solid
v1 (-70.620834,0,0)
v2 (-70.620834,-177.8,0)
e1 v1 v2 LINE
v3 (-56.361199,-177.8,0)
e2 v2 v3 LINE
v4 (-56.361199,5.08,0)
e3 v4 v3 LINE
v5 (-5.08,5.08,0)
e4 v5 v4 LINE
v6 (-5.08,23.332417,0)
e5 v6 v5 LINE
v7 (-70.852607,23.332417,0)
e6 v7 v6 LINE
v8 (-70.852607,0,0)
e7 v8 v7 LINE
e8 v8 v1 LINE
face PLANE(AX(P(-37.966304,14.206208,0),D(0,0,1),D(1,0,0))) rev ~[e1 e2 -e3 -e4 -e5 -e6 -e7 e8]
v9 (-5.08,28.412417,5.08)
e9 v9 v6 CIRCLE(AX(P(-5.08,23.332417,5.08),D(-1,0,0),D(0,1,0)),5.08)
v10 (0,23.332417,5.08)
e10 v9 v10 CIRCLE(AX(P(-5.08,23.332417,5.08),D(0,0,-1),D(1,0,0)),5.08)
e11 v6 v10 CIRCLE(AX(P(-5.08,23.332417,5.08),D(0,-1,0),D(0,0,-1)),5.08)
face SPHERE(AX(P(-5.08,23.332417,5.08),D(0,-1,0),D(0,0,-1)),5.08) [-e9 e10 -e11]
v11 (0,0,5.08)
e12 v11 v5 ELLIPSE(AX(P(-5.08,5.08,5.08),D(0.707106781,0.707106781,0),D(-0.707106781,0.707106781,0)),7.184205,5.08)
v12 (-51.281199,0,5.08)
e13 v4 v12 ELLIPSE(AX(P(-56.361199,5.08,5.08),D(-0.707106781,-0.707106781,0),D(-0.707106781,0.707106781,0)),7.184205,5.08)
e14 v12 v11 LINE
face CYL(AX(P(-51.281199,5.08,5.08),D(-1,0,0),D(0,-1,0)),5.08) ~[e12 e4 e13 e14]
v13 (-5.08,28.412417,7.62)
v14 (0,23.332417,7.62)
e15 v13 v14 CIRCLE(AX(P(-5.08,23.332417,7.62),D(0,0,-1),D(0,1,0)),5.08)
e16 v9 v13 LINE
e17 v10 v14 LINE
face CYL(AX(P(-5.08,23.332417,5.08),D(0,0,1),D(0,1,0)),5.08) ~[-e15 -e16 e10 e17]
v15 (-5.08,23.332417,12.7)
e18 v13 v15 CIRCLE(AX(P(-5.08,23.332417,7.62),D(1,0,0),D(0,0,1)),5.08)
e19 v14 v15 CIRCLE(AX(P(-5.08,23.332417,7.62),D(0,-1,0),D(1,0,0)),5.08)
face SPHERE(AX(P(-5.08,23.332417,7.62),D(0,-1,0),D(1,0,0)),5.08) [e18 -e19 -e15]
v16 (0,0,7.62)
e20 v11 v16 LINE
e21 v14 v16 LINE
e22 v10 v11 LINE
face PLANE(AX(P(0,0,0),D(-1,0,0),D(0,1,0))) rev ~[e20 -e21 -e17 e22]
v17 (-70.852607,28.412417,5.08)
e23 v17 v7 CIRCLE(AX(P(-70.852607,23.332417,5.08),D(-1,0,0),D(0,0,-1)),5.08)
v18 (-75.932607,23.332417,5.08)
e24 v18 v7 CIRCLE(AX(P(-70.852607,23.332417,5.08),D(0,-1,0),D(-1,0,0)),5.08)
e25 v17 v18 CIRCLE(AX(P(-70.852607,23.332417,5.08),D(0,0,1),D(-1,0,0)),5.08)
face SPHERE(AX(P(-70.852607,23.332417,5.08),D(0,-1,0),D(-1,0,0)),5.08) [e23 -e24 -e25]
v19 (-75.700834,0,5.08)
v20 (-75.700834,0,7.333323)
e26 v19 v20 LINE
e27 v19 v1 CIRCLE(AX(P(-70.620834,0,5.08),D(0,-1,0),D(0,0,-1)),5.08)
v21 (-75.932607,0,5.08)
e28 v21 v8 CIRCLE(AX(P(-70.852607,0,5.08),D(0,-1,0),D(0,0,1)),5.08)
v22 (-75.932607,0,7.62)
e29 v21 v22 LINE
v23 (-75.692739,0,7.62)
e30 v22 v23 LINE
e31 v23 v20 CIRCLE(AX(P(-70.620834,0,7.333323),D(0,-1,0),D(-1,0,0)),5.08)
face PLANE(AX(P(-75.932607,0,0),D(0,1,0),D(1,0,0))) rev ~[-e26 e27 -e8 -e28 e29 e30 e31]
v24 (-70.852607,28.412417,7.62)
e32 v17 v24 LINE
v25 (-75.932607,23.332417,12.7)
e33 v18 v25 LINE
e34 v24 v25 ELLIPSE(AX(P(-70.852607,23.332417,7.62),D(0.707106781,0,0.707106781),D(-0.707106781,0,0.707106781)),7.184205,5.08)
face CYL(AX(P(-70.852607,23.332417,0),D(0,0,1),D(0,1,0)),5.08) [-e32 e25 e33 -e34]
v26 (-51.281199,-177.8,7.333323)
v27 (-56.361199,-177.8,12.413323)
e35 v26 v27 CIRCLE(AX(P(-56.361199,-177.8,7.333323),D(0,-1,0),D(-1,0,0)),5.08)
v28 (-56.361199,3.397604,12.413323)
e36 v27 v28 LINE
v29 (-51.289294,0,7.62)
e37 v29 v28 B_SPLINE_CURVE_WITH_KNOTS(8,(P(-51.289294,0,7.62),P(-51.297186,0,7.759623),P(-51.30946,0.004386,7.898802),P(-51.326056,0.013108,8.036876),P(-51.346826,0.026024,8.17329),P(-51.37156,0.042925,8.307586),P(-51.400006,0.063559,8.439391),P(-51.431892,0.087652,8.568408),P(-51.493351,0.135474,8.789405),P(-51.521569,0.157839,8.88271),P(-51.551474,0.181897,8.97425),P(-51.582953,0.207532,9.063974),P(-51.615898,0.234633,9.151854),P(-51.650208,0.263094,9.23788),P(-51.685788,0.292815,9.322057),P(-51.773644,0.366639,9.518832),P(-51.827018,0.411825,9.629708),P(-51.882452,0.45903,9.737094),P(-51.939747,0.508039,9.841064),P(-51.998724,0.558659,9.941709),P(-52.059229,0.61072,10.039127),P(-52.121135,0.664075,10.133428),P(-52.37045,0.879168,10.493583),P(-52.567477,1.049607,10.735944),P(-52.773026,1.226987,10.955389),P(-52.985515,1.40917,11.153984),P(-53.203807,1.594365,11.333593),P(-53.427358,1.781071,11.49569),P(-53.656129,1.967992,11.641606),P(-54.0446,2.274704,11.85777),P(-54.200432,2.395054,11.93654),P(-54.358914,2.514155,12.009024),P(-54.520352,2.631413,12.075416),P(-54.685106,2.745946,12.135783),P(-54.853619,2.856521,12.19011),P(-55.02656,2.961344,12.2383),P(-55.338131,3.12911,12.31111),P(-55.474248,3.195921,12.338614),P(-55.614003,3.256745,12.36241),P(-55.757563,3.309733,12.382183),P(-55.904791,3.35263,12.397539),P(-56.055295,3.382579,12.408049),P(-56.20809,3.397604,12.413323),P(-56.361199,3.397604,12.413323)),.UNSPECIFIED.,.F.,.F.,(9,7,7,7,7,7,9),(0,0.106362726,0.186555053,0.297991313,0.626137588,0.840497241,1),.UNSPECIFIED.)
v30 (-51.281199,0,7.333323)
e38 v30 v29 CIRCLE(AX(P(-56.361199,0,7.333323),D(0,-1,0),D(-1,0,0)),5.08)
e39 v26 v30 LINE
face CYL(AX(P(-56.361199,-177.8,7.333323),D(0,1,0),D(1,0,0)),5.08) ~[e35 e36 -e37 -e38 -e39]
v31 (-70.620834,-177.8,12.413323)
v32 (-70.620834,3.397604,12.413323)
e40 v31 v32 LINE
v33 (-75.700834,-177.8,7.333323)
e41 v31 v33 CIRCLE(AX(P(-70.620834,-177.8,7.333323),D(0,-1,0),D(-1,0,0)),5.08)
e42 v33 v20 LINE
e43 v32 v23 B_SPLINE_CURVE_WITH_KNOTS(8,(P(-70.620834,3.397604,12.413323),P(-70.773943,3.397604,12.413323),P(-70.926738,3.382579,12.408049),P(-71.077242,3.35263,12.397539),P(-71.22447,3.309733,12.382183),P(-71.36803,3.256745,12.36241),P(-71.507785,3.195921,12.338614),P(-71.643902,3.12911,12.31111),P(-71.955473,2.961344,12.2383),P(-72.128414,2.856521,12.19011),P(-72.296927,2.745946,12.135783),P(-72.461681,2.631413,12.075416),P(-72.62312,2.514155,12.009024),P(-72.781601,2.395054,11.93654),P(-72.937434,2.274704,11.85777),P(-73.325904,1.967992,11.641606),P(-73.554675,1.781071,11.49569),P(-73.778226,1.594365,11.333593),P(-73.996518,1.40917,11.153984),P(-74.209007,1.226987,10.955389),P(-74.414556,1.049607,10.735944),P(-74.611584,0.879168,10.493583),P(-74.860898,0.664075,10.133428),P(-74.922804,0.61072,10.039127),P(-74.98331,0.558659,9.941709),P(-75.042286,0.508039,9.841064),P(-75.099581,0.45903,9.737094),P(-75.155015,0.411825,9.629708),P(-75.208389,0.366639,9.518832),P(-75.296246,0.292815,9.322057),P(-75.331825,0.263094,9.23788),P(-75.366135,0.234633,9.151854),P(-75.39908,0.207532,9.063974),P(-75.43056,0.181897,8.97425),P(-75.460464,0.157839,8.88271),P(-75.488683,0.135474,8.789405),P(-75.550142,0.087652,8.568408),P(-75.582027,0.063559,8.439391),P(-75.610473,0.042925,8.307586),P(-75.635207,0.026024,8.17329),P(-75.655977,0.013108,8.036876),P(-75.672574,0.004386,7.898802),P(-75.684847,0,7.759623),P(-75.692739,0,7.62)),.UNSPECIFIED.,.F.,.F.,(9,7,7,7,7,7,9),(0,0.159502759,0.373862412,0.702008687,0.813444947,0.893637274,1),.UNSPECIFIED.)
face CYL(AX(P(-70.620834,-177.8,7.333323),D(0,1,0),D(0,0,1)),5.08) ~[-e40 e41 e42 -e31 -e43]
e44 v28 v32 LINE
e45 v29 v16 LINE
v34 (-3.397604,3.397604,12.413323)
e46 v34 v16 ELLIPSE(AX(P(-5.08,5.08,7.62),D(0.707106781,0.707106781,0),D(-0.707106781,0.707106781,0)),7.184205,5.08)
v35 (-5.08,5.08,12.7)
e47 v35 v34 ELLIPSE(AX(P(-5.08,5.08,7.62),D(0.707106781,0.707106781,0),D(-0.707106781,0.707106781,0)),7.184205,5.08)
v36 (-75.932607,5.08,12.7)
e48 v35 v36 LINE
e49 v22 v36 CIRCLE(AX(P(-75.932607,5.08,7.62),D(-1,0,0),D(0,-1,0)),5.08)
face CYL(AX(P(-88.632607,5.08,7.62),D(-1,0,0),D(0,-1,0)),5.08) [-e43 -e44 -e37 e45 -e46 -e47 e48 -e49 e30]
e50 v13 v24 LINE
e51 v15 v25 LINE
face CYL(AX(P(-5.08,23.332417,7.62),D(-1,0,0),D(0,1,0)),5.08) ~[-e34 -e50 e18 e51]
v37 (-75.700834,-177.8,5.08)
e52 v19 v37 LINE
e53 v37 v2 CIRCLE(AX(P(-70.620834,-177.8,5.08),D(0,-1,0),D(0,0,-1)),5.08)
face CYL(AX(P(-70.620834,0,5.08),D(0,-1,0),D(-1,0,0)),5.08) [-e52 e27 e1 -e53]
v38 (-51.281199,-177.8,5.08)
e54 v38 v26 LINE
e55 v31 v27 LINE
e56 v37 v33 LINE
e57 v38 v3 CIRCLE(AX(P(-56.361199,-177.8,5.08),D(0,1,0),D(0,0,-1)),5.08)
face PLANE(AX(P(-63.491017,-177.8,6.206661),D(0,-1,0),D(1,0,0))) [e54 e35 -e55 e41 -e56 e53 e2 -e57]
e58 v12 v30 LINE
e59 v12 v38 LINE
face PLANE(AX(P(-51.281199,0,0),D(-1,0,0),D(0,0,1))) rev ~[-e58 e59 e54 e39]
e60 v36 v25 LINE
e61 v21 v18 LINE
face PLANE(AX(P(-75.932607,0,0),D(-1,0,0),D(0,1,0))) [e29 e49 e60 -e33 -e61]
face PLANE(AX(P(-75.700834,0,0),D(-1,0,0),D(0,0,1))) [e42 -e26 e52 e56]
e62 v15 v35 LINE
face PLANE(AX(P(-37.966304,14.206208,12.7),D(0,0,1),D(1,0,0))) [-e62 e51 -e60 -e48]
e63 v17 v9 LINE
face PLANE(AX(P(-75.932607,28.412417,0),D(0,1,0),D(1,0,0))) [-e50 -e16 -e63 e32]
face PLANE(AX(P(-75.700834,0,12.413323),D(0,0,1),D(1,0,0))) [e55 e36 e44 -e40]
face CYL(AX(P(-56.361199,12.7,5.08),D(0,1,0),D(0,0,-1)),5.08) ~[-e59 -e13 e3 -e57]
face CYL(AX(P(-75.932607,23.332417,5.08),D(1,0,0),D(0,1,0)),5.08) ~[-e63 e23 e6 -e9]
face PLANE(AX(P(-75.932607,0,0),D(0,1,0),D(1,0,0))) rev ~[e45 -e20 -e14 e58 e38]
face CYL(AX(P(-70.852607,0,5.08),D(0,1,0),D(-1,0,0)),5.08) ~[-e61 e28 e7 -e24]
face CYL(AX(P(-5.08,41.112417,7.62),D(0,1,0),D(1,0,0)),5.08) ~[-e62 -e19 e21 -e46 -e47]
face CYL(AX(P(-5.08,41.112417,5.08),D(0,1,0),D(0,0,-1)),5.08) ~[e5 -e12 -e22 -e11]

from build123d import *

# Parameters (mm, degrees)
F0_W         = 75.9326070547
F0_H         = 28.4124165773
F1_DEPTH     = 12.7
F2_W         = 24.4196355343
F2_H         = 12.4133229256
F3_DEPTH     = 177.8
F4_T1_DEPTH  = 53.8124165773
F4_T3_DEPTH  = 63.9811988592
F4_T5_DEPTH  = 190.5
F4_T10_DEPTH = 101.3326070547
F4_T16_DEPTH = 101.3326070547
F4_T22_DEPTH = 101.3326070547
F4_T29_DEPTH = 101.3326070547
F4_T35_DEPTH = 101.3326070547
F4_T42_DEPTH = 76.6811988592
F4_T46_DEPTH = 203.2
F5_R         = 5.08
F6_R         = 5.08


# Not quite as in the source:
# - a fillet or chamfer that OpenCascade refuses, or shapes differently, is made with other operations: its cross-section is extruded or revolved along the edge and cut away or added


with BuildPart() as f1:
    # F0 (on Top) → F1 (new body)
    with BuildSketch(Plane.XY):
        with Locations((-37.9663035274, 14.2062082887)):
            Rectangle(F0_W, F0_H)
    extrude(amount=F1_DEPTH)

    # F2 (on Front) → F3 (join)
    with BuildSketch(Plane.XZ):
        with Locations((-63.4910166264, 6.2066614628)):
            Rectangle(F2_W, F2_H)
    extrude(amount=F3_DEPTH)

    # F4: fillet of radius 5.08 on 5 edges, made by hand

    # F4_s2 → F4_t1 (cut)
    with BuildSketch(Plane.XZ.offset(-41.1124165773)):
        with BuildLine():
            ThreePointArc((-5.08, 0), (-1.4878975516, 1.4878975516), (0, 5.08))
            Line((0, 5.08), (0, 0))
            Line((0, 0), (-5.08, 0))
        make_face()
        with BuildLine():
            ThreePointArc((0, 7.62), (-1.4878975516, 11.2121024484), (-5.08, 12.7))
            Line((-5.08, 12.7), (0, 12.7))
            Line((0, 12.7), (0, 7.62))
        make_face()
    extrude(amount=F4_T1_DEPTH, mode=Mode.SUBTRACT)

    # F4_s4 → F4_t3 (cut)
    with BuildSketch(Plane.YZ.offset(-51.2811988592)):
        with BuildLine():
            ThreePointArc((0, 5.08), (1.4878975516, 1.4878975516), (5.08, 0))
            Line((5.08, 0), (0, 0))
            Line((0, 0), (0, 5.08))
        make_face()
    extrude(amount=F4_T3_DEPTH, mode=Mode.SUBTRACT)

    # F4_s6 → F4_t5 (cut)
    with BuildSketch(Plane.XZ):
        with BuildLine():
            ThreePointArc((-56.3611988592, 0), (-52.7690964108, 1.4878975516), (-51.2811988592, 5.08))
            Line((-51.2811988592, 5.08), (-51.2811988592, 0))
            Line((-51.2811988592, 0), (-56.3611988592, 0))
        make_face()
    extrude(amount=F4_T5_DEPTH, mode=Mode.SUBTRACT)


with BuildPart() as f4_tool8:
    # F4_s9 → F4_t10 (new body)
    with BuildSketch(Plane.YZ.offset(-88.6326070547)):
        with BuildLine():
            ThreePointArc((0, 7.62), (1.4878975516, 11.2121024484), (5.08, 12.7))
            Line((5.08, 12.7), (0, 12.7))
            Line((0, 12.7), (0, 7.62))
        make_face()
    extrude(amount=F4_T10_DEPTH)

    split(bisect_by=Plane.YZ.offset(-75.7008343935), keep=Keep.BOTTOM)

    split(bisect_by=Plane.XY.offset(12.4133229256), keep=Keep.BOTTOM)


with BuildPart() as f1_1:
    add(f1.part)

    # F4_t7: cut F4_tool8
    add(f4_tool8.part, mode=Mode.SUBTRACT)


with BuildPart() as f4_tool14:
    # F4_s15 → F4_t16 (new body)
    with BuildSketch(Plane.YZ.offset(-88.6326070547)):
        with BuildLine():
            ThreePointArc((0, 7.62), (1.4878975516, 11.2121024484), (5.08, 12.7))
            Line((5.08, 12.7), (0, 12.7))
            Line((0, 12.7), (0, 7.62))
        make_face()
    extrude(amount=F4_T16_DEPTH)

    split(bisect_by=Plane.YZ.offset(-75.7008343935), keep=Keep.BOTTOM)

    split(bisect_by=Plane.XY.offset(12.4133229256), keep=Keep.TOP)


with BuildPart() as f1_2:
    add(f1_1.part)

    # F4_t13: cut F4_tool14
    add(f4_tool14.part, mode=Mode.SUBTRACT)


with BuildPart() as f4_tool20:
    # F4_s21 → F4_t22 (new body)
    with BuildSketch(Plane.YZ.offset(-88.6326070547)):
        with BuildLine():
            ThreePointArc((0, 7.62), (1.4878975516, 11.2121024484), (5.08, 12.7))
            Line((5.08, 12.7), (0, 12.7))
            Line((0, 12.7), (0, 7.62))
        make_face()
    extrude(amount=F4_T22_DEPTH)

    split(bisect_by=Plane.YZ.offset(-75.7008343935), keep=Keep.TOP)

    split(bisect_by=Plane.XY.offset(12.4133229256), keep=Keep.TOP)

    split(bisect_by=Plane.YZ.offset(-51.2811988592), keep=Keep.BOTTOM)


with BuildPart() as f1_3:
    add(f1_2.part)

    # F4_t19: cut F4_tool20
    add(f4_tool20.part, mode=Mode.SUBTRACT)


with BuildPart() as f4_tool27:
    # F4_s28 → F4_t29 (new body)
    with BuildSketch(Plane.YZ.offset(-88.6326070547)):
        with BuildLine():
            ThreePointArc((0, 7.62), (1.4878975516, 11.2121024484), (5.08, 12.7))
            Line((5.08, 12.7), (0, 12.7))
            Line((0, 12.7), (0, 7.62))
        make_face()
    extrude(amount=F4_T29_DEPTH)

    split(bisect_by=Plane.XY.offset(12.4133229256), keep=Keep.BOTTOM)

    split(bisect_by=Plane.YZ.offset(-51.2811988592), keep=Keep.TOP)


with BuildPart() as f1_4:
    add(f1_3.part)

    # F4_t26: cut F4_tool27
    add(f4_tool27.part, mode=Mode.SUBTRACT)


with BuildPart() as f4_tool33:
    # F4_s34 → F4_t35 (new body)
    with BuildSketch(Plane.YZ.offset(-88.6326070547)):
        with BuildLine():
            ThreePointArc((0, 7.62), (1.4878975516, 11.2121024484), (5.08, 12.7))
            Line((5.08, 12.7), (0, 12.7))
            Line((0, 12.7), (0, 7.62))
        make_face()
    extrude(amount=F4_T35_DEPTH)

    split(bisect_by=Plane.XY.offset(12.4133229256), keep=Keep.TOP)

    split(bisect_by=Plane.YZ.offset(-51.2811988592), keep=Keep.TOP)


with BuildPart() as f1_5:
    add(f1_4.part)

    # F4_t32: cut F4_tool33
    add(f4_tool33.part, mode=Mode.SUBTRACT)


with BuildPart() as f4_tool40:
    # F4_s41 → F4_t42 (new body)
    with BuildSketch(Plane.YZ.offset(-63.9811988592)):
        with BuildLine():
            ThreePointArc((0, 5.08), (1.4878975516, 1.4878975516), (5.08, 0))
            Line((5.08, 0), (0, 0))
            Line((0, 0), (0, 5.08))
        make_face()
    extrude(amount=F4_T42_DEPTH)

    split(bisect_by=Plane.YZ.offset(-51.2811988592), keep=Keep.BOTTOM)


with BuildPart() as f4_tool44:
    # F4_s45 → F4_t46 (new body)
    with BuildSketch(Plane.XZ.offset(-12.7)):
        with BuildLine():
            ThreePointArc((-56.3611988592, 0), (-52.7690964108, 1.4878975516), (-51.2811988592, 5.08))
            Line((-51.2811988592, 5.08), (-51.2811988592, 0))
            Line((-51.2811988592, 0), (-56.3611988592, 0))
        make_face()
    extrude(amount=F4_T46_DEPTH)

    split(bisect_by=Plane.XZ, keep=Keep.BOTTOM)


with BuildPart() as f4_tool40_1:
    add(f4_tool40.part)

    # F4_t48: intersect F4_tool44
    add(f4_tool44.part, mode=Mode.INTERSECT)


with BuildPart() as f1_6:
    add(f1_5.part)

    # F4_t38: cut F4_tool40
    add(f4_tool40_1.part, mode=Mode.SUBTRACT)

    # F5
    f5_edges = [f1_6.edges().sort_by_distance(p)[0] for p in [
        (-51.281199, -87.201198, 12.413323),
        (-75.700834, -87.201198, 12.413323),
        (-75.700834, -88.9, 0),
    ]]
    fillet(f5_edges, radius=F5_R)

    # F6
    f6_edges = [f1_6.edges().sort_by_distance(p)[0] for p in [
        (-75.932607, 14.206208, 0),
        (-75.932607, 28.412417, 6.35),
        (-40.506304, 28.412417, 0),
    ]]
    fillet(f6_edges, radius=F6_R)


solid = f1_6.part
